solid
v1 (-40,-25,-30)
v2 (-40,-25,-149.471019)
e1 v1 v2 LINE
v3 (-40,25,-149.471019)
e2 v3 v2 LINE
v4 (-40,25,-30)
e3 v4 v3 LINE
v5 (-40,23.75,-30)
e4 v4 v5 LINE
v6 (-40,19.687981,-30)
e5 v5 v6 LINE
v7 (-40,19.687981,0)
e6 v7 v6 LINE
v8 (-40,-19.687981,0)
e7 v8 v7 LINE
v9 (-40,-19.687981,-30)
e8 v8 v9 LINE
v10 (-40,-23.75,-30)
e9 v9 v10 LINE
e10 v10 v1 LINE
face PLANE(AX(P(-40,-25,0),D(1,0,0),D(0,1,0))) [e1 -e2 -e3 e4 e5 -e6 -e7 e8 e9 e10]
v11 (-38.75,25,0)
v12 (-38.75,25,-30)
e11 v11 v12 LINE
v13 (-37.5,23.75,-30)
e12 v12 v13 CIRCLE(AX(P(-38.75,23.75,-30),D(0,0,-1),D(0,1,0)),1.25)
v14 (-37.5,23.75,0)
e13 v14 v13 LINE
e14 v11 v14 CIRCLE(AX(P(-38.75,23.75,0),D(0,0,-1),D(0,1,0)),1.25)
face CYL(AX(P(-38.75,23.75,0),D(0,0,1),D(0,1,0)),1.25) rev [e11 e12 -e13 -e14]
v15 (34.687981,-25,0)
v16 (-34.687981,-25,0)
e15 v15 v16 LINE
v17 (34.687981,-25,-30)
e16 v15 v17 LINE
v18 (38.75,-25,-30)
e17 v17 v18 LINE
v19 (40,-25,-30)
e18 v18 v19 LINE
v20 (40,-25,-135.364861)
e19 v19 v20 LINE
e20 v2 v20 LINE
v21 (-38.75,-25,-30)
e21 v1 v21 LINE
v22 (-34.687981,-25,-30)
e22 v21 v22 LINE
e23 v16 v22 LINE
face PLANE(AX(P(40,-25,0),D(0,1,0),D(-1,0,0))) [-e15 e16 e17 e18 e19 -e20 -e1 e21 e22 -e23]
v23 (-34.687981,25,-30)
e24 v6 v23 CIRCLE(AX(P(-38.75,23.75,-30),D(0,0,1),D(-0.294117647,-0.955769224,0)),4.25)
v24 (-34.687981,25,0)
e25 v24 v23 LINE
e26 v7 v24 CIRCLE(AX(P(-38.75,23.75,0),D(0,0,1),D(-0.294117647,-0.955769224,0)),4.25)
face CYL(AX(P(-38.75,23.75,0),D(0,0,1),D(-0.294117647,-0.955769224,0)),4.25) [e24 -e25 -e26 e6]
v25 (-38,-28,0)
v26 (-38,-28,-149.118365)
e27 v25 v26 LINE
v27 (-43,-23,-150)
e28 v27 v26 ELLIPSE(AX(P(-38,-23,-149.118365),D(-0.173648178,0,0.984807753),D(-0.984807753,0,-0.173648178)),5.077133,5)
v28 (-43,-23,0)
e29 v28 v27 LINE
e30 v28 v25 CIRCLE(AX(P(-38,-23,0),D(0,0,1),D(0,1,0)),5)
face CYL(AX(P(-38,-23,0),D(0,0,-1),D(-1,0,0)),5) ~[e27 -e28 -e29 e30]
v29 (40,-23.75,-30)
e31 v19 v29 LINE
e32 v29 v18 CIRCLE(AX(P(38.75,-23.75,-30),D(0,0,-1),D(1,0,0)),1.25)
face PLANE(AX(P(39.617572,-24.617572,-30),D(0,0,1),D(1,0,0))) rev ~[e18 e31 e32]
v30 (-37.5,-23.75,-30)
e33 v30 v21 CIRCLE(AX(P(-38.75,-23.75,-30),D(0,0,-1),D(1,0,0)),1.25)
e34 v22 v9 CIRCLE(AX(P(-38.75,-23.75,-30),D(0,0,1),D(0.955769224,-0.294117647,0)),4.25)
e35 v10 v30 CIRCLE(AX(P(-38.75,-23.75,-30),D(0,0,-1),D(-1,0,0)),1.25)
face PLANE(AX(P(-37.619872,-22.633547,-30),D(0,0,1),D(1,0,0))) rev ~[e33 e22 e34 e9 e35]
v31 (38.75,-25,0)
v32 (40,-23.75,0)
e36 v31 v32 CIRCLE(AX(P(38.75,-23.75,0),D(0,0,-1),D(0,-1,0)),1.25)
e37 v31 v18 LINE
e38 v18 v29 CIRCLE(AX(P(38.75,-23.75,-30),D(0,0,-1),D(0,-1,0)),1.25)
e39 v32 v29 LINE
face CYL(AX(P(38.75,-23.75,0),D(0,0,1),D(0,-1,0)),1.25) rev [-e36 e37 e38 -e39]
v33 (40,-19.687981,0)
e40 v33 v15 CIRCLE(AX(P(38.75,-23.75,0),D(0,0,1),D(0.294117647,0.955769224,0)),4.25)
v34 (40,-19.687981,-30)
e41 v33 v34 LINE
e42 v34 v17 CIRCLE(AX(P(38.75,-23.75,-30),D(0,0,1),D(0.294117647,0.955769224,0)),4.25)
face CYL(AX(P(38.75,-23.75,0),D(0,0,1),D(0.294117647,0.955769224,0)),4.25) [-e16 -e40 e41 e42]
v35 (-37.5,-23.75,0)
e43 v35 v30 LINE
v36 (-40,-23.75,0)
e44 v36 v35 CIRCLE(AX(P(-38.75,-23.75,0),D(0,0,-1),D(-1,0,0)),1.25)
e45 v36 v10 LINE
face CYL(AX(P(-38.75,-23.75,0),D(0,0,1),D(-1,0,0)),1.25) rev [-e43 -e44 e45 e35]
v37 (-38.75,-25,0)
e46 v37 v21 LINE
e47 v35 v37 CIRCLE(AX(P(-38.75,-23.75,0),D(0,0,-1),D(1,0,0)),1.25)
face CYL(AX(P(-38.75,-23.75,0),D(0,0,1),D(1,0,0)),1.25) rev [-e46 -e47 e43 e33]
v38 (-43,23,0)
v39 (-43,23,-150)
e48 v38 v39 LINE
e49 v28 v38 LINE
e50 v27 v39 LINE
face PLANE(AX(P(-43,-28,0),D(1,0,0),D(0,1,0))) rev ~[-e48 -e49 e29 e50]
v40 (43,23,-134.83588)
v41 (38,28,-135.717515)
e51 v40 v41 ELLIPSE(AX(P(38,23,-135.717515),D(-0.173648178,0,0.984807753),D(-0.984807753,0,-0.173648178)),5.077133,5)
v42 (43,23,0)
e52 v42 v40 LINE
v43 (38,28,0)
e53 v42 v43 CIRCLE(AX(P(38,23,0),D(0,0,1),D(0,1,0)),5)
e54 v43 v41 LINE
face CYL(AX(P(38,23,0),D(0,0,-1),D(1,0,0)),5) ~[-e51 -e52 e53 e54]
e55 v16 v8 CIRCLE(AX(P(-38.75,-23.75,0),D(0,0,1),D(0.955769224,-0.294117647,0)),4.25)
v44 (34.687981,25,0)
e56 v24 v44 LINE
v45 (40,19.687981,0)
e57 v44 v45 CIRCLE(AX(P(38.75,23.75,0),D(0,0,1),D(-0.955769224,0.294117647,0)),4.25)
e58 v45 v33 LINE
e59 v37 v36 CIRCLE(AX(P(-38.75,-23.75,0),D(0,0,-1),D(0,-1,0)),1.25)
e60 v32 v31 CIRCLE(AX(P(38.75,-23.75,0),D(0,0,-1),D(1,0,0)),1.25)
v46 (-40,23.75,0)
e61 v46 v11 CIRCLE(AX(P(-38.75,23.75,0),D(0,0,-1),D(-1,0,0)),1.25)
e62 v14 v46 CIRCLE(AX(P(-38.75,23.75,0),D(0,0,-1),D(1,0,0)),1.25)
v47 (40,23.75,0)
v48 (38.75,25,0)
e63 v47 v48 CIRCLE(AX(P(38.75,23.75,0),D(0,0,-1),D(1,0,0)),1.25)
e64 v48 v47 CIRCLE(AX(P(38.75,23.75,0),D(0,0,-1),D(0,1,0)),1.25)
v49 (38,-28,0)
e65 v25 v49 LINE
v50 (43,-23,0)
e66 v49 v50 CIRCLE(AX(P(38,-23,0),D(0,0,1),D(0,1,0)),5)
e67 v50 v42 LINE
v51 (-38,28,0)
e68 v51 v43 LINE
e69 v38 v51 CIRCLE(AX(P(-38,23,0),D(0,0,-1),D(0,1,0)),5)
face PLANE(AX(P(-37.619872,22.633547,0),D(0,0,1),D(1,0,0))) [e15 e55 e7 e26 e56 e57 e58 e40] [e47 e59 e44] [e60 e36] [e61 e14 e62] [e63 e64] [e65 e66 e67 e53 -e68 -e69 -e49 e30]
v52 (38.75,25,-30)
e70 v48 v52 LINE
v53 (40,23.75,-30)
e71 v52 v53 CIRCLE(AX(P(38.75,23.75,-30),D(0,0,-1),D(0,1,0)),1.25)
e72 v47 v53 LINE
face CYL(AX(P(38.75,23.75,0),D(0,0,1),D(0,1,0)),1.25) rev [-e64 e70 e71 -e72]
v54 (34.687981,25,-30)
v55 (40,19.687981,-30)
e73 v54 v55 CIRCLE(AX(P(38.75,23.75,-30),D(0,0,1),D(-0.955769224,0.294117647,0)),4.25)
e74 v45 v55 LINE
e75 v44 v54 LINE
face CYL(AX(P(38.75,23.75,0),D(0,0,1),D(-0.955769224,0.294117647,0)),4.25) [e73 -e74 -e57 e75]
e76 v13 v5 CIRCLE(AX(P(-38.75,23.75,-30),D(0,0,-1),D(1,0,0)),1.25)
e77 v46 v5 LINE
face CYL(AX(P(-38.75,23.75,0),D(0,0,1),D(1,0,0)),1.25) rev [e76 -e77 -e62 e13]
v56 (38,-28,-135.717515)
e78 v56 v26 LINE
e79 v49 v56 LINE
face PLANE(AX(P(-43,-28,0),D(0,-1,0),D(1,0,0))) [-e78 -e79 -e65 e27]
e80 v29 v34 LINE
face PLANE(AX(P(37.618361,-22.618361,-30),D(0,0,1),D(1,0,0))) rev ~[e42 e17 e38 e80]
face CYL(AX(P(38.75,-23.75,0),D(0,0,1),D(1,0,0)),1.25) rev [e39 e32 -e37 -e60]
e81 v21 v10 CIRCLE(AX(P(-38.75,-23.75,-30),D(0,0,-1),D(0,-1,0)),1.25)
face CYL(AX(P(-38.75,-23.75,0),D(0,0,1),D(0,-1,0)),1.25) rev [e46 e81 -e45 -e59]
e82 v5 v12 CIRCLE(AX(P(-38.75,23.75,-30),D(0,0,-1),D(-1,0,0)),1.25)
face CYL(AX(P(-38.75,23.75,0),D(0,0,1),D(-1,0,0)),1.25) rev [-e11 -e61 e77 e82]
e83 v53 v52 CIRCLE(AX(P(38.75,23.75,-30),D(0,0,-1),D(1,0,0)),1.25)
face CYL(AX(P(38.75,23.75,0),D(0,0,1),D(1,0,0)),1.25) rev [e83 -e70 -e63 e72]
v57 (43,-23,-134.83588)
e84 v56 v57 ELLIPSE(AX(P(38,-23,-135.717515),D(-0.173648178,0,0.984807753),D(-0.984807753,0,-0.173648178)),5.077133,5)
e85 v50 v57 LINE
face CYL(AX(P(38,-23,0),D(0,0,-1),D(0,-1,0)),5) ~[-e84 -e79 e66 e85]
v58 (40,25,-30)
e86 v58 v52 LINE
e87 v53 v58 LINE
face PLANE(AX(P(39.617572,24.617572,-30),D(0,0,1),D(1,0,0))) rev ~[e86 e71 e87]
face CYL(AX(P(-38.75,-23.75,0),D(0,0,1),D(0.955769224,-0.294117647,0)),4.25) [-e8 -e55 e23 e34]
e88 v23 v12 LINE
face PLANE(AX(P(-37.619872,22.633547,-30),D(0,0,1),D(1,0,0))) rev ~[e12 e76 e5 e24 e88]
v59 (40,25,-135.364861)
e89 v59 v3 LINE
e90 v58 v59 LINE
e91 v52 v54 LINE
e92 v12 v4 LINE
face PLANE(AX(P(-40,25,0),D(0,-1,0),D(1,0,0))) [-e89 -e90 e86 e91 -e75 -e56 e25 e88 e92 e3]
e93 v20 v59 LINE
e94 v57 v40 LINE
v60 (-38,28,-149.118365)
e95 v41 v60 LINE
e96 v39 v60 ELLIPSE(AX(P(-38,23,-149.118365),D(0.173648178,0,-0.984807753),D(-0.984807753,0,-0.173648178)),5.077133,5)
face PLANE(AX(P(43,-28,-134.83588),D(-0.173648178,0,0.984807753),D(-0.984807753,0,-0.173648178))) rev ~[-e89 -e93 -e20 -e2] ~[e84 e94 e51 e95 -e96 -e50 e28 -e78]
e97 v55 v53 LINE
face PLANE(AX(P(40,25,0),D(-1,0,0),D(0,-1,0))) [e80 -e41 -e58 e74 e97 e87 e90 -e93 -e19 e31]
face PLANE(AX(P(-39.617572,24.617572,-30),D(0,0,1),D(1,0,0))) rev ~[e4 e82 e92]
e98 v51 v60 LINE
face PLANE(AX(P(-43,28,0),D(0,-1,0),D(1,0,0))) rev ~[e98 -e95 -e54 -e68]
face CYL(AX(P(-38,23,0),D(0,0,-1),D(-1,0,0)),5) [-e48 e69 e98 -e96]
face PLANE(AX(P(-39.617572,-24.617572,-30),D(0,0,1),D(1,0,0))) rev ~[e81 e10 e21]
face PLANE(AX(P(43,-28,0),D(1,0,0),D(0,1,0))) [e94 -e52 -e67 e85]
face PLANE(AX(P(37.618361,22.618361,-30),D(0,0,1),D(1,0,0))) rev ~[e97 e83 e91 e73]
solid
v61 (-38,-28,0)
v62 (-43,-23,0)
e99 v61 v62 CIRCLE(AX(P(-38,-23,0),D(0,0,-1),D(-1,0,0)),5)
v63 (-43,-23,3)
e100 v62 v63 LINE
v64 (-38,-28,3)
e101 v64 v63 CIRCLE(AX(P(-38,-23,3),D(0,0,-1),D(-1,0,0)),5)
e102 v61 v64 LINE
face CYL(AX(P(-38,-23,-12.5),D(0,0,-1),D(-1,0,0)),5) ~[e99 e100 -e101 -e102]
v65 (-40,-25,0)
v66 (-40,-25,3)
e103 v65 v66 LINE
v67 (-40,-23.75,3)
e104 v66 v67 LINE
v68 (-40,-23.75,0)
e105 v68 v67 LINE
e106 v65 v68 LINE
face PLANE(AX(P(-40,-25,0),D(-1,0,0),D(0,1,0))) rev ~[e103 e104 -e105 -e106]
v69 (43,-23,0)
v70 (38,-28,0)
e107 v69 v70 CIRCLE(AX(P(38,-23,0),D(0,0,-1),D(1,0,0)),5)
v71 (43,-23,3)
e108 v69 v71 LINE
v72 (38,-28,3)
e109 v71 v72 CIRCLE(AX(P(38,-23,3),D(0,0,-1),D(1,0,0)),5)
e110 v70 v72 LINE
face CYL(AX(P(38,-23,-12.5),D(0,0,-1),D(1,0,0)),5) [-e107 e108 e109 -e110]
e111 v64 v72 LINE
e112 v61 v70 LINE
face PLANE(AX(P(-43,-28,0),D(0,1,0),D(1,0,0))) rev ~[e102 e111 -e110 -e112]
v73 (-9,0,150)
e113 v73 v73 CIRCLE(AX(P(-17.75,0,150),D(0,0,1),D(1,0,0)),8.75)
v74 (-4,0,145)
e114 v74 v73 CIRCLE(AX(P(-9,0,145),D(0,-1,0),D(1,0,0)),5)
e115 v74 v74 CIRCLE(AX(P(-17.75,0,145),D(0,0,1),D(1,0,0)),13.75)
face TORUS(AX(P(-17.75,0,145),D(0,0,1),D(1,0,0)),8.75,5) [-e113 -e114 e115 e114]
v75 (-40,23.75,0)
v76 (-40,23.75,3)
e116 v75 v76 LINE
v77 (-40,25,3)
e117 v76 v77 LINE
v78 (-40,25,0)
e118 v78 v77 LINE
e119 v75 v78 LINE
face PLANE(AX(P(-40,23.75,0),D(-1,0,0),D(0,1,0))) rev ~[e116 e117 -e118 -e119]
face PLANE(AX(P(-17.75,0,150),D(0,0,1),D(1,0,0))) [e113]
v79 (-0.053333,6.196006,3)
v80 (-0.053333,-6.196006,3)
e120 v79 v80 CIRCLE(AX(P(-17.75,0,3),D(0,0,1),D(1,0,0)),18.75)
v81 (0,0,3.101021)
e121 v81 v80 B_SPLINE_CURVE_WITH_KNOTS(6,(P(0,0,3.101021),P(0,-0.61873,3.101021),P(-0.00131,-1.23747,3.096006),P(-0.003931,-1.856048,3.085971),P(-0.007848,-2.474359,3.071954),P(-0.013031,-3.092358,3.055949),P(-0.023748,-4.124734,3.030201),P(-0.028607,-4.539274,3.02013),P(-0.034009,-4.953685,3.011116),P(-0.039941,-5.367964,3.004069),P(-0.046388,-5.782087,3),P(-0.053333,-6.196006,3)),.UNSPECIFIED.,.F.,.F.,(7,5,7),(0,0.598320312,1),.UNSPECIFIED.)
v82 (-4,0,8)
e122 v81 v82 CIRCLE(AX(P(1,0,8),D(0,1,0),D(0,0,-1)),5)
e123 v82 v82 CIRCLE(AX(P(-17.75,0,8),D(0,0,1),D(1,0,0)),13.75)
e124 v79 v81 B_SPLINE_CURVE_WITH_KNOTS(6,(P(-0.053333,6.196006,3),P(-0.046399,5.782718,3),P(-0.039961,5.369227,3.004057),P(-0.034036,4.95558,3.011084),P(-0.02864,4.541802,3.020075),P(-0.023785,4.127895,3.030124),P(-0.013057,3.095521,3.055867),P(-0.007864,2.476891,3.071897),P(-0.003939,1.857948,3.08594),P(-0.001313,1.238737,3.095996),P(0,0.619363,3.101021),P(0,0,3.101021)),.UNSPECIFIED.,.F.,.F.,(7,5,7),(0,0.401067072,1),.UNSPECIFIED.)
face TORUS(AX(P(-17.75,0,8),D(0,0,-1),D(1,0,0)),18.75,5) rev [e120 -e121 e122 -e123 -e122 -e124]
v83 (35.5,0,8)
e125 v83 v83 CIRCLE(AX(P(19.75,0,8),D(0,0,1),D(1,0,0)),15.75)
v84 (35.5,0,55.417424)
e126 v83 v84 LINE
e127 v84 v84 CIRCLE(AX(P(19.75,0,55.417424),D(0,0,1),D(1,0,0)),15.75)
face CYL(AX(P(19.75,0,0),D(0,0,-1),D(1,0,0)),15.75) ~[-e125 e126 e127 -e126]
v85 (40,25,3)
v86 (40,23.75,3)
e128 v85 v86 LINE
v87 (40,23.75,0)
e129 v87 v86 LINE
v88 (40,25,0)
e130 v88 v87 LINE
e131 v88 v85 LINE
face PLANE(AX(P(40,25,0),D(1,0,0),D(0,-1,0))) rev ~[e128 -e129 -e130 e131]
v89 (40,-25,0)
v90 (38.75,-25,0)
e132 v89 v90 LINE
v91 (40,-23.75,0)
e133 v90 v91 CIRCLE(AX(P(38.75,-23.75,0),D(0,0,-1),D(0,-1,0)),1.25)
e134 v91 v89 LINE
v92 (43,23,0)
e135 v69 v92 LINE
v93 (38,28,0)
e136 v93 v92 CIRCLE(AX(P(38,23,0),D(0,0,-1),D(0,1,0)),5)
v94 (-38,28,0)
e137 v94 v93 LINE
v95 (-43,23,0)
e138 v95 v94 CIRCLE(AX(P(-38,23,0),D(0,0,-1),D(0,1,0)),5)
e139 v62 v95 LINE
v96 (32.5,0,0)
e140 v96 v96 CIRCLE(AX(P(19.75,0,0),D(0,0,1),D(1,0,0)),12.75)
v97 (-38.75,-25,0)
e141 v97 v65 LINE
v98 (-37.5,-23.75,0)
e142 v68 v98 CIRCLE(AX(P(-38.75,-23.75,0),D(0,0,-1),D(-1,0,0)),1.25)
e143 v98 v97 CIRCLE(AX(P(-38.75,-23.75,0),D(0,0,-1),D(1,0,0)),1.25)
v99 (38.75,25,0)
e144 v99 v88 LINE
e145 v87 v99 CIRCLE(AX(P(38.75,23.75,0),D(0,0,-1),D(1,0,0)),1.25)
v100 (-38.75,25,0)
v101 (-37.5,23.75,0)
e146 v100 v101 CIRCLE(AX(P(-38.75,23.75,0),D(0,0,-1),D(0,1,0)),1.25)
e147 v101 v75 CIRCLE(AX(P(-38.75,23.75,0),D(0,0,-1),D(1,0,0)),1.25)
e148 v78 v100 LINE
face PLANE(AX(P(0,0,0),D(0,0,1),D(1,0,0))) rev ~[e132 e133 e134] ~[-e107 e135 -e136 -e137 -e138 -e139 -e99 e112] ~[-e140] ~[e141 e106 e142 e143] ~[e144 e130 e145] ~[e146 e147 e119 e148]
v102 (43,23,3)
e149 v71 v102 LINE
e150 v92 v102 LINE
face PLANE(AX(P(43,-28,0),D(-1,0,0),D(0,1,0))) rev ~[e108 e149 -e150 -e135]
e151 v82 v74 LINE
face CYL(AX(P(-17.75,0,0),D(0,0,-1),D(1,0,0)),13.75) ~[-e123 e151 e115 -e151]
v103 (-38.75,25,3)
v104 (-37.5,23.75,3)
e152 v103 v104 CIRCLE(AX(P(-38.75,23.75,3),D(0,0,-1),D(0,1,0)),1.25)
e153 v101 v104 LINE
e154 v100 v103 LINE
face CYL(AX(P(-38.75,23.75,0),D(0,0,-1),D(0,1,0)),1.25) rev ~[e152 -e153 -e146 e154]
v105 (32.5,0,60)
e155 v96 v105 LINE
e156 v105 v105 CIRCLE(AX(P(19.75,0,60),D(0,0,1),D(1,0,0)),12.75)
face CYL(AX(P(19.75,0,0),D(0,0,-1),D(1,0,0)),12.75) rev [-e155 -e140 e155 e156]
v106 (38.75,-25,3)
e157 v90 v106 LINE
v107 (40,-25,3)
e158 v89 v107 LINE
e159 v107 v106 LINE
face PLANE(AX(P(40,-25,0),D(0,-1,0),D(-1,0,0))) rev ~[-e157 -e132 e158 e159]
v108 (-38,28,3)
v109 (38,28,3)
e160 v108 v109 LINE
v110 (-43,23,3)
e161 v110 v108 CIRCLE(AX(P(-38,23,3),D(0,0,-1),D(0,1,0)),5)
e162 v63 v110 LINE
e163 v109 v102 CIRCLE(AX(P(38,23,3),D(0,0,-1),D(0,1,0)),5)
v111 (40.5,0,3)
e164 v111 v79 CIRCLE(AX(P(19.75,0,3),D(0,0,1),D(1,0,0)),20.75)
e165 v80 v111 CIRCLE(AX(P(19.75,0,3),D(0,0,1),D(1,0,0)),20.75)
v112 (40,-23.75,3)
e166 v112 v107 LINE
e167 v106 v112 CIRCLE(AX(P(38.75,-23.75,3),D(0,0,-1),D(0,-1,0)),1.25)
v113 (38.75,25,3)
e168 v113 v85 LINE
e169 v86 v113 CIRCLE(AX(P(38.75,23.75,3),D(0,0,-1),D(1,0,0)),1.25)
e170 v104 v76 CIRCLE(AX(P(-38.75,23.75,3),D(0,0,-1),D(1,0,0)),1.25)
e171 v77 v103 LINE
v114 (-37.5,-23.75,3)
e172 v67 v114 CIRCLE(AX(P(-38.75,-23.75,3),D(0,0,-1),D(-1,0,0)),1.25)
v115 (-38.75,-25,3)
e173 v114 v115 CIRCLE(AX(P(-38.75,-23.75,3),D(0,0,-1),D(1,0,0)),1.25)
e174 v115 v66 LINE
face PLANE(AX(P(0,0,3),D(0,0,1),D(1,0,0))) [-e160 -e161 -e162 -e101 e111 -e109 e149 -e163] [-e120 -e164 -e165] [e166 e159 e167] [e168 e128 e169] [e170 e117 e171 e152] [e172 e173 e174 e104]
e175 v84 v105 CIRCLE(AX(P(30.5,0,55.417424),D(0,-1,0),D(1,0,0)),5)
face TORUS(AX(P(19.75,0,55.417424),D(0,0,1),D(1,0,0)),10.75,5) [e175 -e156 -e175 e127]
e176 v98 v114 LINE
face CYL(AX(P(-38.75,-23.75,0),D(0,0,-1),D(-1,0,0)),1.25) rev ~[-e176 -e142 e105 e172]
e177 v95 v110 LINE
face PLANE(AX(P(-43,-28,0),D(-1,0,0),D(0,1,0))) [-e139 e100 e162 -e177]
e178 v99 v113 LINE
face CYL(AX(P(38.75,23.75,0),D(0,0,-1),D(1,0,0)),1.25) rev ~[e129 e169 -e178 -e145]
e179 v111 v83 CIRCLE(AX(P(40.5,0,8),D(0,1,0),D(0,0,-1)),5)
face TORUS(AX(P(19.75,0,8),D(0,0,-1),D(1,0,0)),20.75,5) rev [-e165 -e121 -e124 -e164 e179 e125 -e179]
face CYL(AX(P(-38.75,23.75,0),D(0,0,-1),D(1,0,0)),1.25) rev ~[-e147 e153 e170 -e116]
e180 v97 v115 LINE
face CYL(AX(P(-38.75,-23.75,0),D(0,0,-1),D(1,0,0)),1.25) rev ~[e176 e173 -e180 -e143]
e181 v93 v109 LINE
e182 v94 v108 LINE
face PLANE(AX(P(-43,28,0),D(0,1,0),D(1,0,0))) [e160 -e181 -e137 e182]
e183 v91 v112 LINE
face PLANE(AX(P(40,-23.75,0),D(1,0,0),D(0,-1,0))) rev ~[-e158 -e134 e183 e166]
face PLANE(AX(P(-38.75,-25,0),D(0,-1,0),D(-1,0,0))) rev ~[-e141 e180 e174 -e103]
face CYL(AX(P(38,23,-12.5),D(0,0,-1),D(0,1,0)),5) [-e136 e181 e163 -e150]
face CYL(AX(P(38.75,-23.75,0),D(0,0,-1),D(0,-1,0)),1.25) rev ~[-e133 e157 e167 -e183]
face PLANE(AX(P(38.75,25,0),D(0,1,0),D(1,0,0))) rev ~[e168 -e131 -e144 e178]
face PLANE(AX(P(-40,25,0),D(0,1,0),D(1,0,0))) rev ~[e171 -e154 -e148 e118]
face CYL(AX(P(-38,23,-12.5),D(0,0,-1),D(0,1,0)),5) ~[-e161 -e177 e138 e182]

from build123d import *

# Parameters (mm, degrees)
F0_W         = 86
F0_H         = 56
F1_DEPTH     = 150
F2_DEPTH     = 30
F0_R         = 13.75
F0_R_2       = 15.75
F3_DEPTH     = 3
F0_R_3       = 12.75
F4_DEPTH     = 60
F5_DEPTH     = 150
F7_DEPTH     = 56.001
F8_R         = 5
F9_T9_DEPTH  = 28
F9_T11_DEPTH = 28
F9_T13_DEPTH = 28
F9_T15_DEPTH = 28


# Not quite as in the source:
# - a fillet or chamfer that OpenCascade refuses, or shapes differently, is made with other operations: its cross-section is extruded or revolved along the edge and cut away or added


with BuildPart() as f1:
    # F0 (on Top) → F1 (new body)
    with BuildSketch(Plane.XY):
        Rectangle(F0_W, F0_H)
        Polygon((-38.75, 25), (-34.6879807977, 25), (34.6879807977, 25), (38.75, 25), (40, 25), (40, 23.75), (40, 19.6879807977), (40, -19.6879807977), (40, -23.75), (40, -25), (38.75, -25), (34.6879807977, -25), (-34.6879807977, -25), (-38.75, -25), (-40, -25), (-40, -23.75), (-40, -19.6879807977), (-40, 19.6879807977), (-40, 23.75), (-40, 25), align=None, mode=Mode.SUBTRACT)
    extrude(amount=-F1_DEPTH)

    # F0 (on Top) → F2 (join)
    with BuildSketch(Plane.XY):
        with BuildLine():
            ThreePointArc((-40, 19.6879807977), (-35.74479618, 20.74479618), (-34.6879807977, 25))
            Line((-34.6879807977, 25), (-38.75, 25))
            ThreePointArc((-38.75, 25), (-37.8661165235, 24.6338834765), (-37.5, 23.75))
            ThreePointArc((-37.5, 23.75), (-38.75, 22.5), (-40, 23.75))
            Line((-40, 23.75), (-40, 19.6879807977))
        make_face()
        with BuildLine():
            Line((38.75, 25), (34.6879807977, 25))
            ThreePointArc((34.6879807977, 25), (35.74479618, 20.74479618), (40, 19.6879807977))
            Line((40, 19.6879807977), (40, 23.75))
            ThreePointArc((40, 23.75), (37.8661165235, 22.8661165235), (38.75, 25))
        make_face()
        with BuildLine():
            ThreePointArc((-34.6879807977, -25), (-35.74479618, -20.74479618), (-40, -19.6879807977))
            Line((-40, -19.6879807977), (-40, -23.75))
            ThreePointArc((-40, -23.75), (-38.75, -22.5), (-37.5, -23.75))
            ThreePointArc((-37.5, -23.75), (-37.8661165235, -24.6338834765), (-38.75, -25))
            Line((-38.75, -25), (-34.6879807977, -25))
        make_face()
        with BuildLine():
            Line((40, -23.75), (40, -19.6879807977))
            ThreePointArc((40, -19.6879807977), (35.74479618, -20.74479618), (34.6879807977, -25))
            Line((34.6879807977, -25), (38.75, -25))
            ThreePointArc((38.75, -25), (37.8661165235, -22.8661165235), (40, -23.75))
        make_face()
        with BuildLine():
            ThreePointArc((-40, 23.75), (-39.6338834765, 24.6338834765), (-38.75, 25))
            Line((-38.75, 25), (-40, 25))
            Line((-40, 25), (-40, 23.75))
        make_face()
        with BuildLine():
            Line((40, 25), (38.75, 25))
            ThreePointArc((38.75, 25), (39.6338834765, 24.6338834765), (40, 23.75))
            Line((40, 23.75), (40, 25))
        make_face()
        with BuildLine():
            Line((40, -25), (40, -23.75))
            ThreePointArc((40, -23.75), (39.6338834765, -24.6338834765), (38.75, -25))
            Line((38.75, -25), (40, -25))
        make_face()
        with BuildLine():
            ThreePointArc((-38.75, -25), (-39.6338834765, -24.6338834765), (-40, -23.75))
            Line((-40, -23.75), (-40, -25))
            Line((-40, -25), (-38.75, -25))
        make_face()
    extrude(amount=-F2_DEPTH)

    # F6 (on face) → F7 (cut, through all)
    with BuildSketch(Plane.XZ.offset(28)):
        Polygon((43, -134.8358796591), (-43, -150), (43, -150), align=None)
    extrude(amount=-F7_DEPTH, mode=Mode.SUBTRACT)

    # F8
    f8_edges = [f1.edges().sort_by_distance(p)[0] for p in [
        (-43, -28, -75),
        (43, -28, -67.41794),
        (-43, 28, -75),
        (43, 28, -67.41794),
    ]]
    fillet(f8_edges, radius=F8_R)


with BuildPart() as f3:
    # F0 (on Top) → F3 (new body)
    with BuildSketch(Plane.XY):
        Rectangle(F0_W, F0_H)
        Polygon((-38.75, 25), (-34.6879807977, 25), (34.6879807977, 25), (38.75, 25), (40, 25), (40, 23.75), (40, 19.6879807977), (40, -19.6879807977), (40, -23.75), (40, -25), (38.75, -25), (34.6879807977, -25), (-34.6879807977, -25), (-38.75, -25), (-40, -25), (-40, -23.75), (-40, -19.6879807977), (-40, 19.6879807977), (-40, 23.75), (-40, 25), align=None, mode=Mode.SUBTRACT)
        with BuildLine():
            Line((34.6879807977, 25), (-34.6879807977, 25))
            ThreePointArc((-34.6879807977, 25), (-35.74479618, 20.74479618), (-40, 19.6879807977))
            Line((-40, 19.6879807977), (-40, -19.6879807977))
            ThreePointArc((-40, -19.6879807977), (-35.74479618, -20.74479618), (-34.6879807977, -25))
            Line((-34.6879807977, -25), (34.6879807977, -25))
            ThreePointArc((34.6879807977, -25), (35.74479618, -20.74479618), (40, -19.6879807977))
            Line((40, -19.6879807977), (40, 19.6879807977))
            ThreePointArc((40, 19.6879807977), (35.74479618, 20.74479618), (34.6879807977, 25))
        make_face()
        with Locations((-17.75, 0)):
            Circle(F0_R, mode=Mode.SUBTRACT)
        with Locations((19.75, 0)):
            Circle(F0_R_2, mode=Mode.SUBTRACT)
        with BuildLine():
            ThreePointArc((-40, 19.6879807977), (-35.74479618, 20.74479618), (-34.6879807977, 25))
            Line((-34.6879807977, 25), (-38.75, 25))
            ThreePointArc((-38.75, 25), (-37.8661165235, 24.6338834765), (-37.5, 23.75))
            ThreePointArc((-37.5, 23.75), (-38.75, 22.5), (-40, 23.75))
            Line((-40, 23.75), (-40, 19.6879807977))
        make_face()
        with BuildLine():
            ThreePointArc((-34.6879807977, -25), (-35.74479618, -20.74479618), (-40, -19.6879807977))
            Line((-40, -19.6879807977), (-40, -23.75))
            ThreePointArc((-40, -23.75), (-38.75, -22.5), (-37.5, -23.75))
            ThreePointArc((-37.5, -23.75), (-37.8661165235, -24.6338834765), (-38.75, -25))
            Line((-38.75, -25), (-34.6879807977, -25))
        make_face()
        with BuildLine():
            Line((40, -23.75), (40, -19.6879807977))
            ThreePointArc((40, -19.6879807977), (35.74479618, -20.74479618), (34.6879807977, -25))
            Line((34.6879807977, -25), (38.75, -25))
            ThreePointArc((38.75, -25), (37.8661165235, -22.8661165235), (40, -23.75))
        make_face()
        with BuildLine():
            Line((38.75, 25), (34.6879807977, 25))
            ThreePointArc((34.6879807977, 25), (35.74479618, 20.74479618), (40, 19.6879807977))
            Line((40, 19.6879807977), (40, 23.75))
            ThreePointArc((40, 23.75), (37.8661165235, 22.8661165235), (38.75, 25))
        make_face()
    extrude(amount=F3_DEPTH)

    # F0 (on Top) → F4 (join)
    with BuildSketch(Plane.XY):
        with Locations((19.75, 0)):
            Circle(F0_R_2)
        with Locations((19.75, 0)):
            Circle(F0_R_3, mode=Mode.SUBTRACT)
    extrude(amount=F4_DEPTH)

    # F0 (on Top) → F5 (join)
    with BuildSketch(Plane.XY):
        with Locations((-17.75, 0)):
            Circle(F0_R)
    extrude(amount=F5_DEPTH)

    # F9: fillet of radius 5 on 8 edges, made by hand

    # F9_s1 → F9_t2 (revolve, cut)
    with BuildSketch(Plane.XZ):
        with BuildLine():
            ThreePointArc((35.5, 55.417424305), (34.6833001327, 58.1560370926), (32.5, 60))
            Line((32.5, 60), (35.5, 60))
            Line((35.5, 60), (35.5, 55.417424305))
        make_face()
    revolve(axis=Axis((19.75, 0, 60), (0, 0, 1)), mode=Mode.SUBTRACT)

    # F9_s3 → F9_t4 (revolve, cut)
    with BuildSketch(Plane.XZ):
        with BuildLine():
            ThreePointArc((-4, 145), (-5.4644660941, 148.5355339059), (-9, 150))
            Line((-9, 150), (-4, 150))
            Line((-4, 150), (-4, 145))
        make_face()
    revolve(axis=Axis((-17.75, 0, 150), (0, 0, 1)), mode=Mode.SUBTRACT)

    # F9_s5 → F9_t6 (revolve)
    with BuildSketch(Plane.XZ):
        with BuildLine():
            ThreePointArc((40.5, 3), (36.9644660941, 4.4644660941), (35.5, 8))
            Line((35.5, 8), (35.5, 3))
            Line((35.5, 3), (40.5, 3))
        make_face()
    revolve(axis=Axis((19.75, 0, 3), (0, 0, 1)))

    # F9_s7 → F9_t8 (revolve)
    with BuildSketch(Plane.XZ):
        with BuildLine():
            ThreePointArc((1, 3), (-2.5355339059, 4.4644660941), (-4, 8))
            Line((-4, 8), (-4, 3))
            Line((-4, 3), (1, 3))
        make_face()
    revolve(axis=Axis((-17.75, 0, 3), (0, 0, 1)))

    # F9_s10 → F9_t9 (cut)
    with BuildSketch(Plane.XY.offset(-12.5)):
        with BuildLine():
            ThreePointArc((-43, -23), (-41.5355339059, -26.5355339059), (-38, -28))
            Line((-38, -28), (-43, -28))
            Line((-43, -28), (-43, -23))
        make_face()
    extrude(amount=F9_T9_DEPTH, mode=Mode.SUBTRACT)

    # F9_s12 → F9_t11 (cut)
    with BuildSketch(Plane.XY.offset(-12.5)):
        with BuildLine():
            ThreePointArc((43, -23), (41.5355339059, -26.5355339059), (38, -28))
            Line((38, -28), (43, -28))
            Line((43, -28), (43, -23))
        make_face()
    extrude(amount=F9_T11_DEPTH, mode=Mode.SUBTRACT)

    # F9_s14 → F9_t13 (cut)
    with BuildSketch(Plane.XY.offset(-12.5)):
        with BuildLine():
            ThreePointArc((-38, 28), (-41.5355339059, 26.5355339059), (-43, 23))
            Line((-43, 23), (-43, 28))
            Line((-43, 28), (-38, 28))
        make_face()
    extrude(amount=F9_T13_DEPTH, mode=Mode.SUBTRACT)

    # F9_s16 → F9_t15 (cut)
    with BuildSketch(Plane.XY.offset(-12.5)):
        with BuildLine():
            ThreePointArc((38, 28), (41.5355339059, 26.5355339059), (43, 23))
            Line((43, 23), (43, 28))
            Line((43, 28), (38, 28))
        make_face()
    extrude(amount=F9_T15_DEPTH, mode=Mode.SUBTRACT)


solid = Compound([f1.part, f3.part])
